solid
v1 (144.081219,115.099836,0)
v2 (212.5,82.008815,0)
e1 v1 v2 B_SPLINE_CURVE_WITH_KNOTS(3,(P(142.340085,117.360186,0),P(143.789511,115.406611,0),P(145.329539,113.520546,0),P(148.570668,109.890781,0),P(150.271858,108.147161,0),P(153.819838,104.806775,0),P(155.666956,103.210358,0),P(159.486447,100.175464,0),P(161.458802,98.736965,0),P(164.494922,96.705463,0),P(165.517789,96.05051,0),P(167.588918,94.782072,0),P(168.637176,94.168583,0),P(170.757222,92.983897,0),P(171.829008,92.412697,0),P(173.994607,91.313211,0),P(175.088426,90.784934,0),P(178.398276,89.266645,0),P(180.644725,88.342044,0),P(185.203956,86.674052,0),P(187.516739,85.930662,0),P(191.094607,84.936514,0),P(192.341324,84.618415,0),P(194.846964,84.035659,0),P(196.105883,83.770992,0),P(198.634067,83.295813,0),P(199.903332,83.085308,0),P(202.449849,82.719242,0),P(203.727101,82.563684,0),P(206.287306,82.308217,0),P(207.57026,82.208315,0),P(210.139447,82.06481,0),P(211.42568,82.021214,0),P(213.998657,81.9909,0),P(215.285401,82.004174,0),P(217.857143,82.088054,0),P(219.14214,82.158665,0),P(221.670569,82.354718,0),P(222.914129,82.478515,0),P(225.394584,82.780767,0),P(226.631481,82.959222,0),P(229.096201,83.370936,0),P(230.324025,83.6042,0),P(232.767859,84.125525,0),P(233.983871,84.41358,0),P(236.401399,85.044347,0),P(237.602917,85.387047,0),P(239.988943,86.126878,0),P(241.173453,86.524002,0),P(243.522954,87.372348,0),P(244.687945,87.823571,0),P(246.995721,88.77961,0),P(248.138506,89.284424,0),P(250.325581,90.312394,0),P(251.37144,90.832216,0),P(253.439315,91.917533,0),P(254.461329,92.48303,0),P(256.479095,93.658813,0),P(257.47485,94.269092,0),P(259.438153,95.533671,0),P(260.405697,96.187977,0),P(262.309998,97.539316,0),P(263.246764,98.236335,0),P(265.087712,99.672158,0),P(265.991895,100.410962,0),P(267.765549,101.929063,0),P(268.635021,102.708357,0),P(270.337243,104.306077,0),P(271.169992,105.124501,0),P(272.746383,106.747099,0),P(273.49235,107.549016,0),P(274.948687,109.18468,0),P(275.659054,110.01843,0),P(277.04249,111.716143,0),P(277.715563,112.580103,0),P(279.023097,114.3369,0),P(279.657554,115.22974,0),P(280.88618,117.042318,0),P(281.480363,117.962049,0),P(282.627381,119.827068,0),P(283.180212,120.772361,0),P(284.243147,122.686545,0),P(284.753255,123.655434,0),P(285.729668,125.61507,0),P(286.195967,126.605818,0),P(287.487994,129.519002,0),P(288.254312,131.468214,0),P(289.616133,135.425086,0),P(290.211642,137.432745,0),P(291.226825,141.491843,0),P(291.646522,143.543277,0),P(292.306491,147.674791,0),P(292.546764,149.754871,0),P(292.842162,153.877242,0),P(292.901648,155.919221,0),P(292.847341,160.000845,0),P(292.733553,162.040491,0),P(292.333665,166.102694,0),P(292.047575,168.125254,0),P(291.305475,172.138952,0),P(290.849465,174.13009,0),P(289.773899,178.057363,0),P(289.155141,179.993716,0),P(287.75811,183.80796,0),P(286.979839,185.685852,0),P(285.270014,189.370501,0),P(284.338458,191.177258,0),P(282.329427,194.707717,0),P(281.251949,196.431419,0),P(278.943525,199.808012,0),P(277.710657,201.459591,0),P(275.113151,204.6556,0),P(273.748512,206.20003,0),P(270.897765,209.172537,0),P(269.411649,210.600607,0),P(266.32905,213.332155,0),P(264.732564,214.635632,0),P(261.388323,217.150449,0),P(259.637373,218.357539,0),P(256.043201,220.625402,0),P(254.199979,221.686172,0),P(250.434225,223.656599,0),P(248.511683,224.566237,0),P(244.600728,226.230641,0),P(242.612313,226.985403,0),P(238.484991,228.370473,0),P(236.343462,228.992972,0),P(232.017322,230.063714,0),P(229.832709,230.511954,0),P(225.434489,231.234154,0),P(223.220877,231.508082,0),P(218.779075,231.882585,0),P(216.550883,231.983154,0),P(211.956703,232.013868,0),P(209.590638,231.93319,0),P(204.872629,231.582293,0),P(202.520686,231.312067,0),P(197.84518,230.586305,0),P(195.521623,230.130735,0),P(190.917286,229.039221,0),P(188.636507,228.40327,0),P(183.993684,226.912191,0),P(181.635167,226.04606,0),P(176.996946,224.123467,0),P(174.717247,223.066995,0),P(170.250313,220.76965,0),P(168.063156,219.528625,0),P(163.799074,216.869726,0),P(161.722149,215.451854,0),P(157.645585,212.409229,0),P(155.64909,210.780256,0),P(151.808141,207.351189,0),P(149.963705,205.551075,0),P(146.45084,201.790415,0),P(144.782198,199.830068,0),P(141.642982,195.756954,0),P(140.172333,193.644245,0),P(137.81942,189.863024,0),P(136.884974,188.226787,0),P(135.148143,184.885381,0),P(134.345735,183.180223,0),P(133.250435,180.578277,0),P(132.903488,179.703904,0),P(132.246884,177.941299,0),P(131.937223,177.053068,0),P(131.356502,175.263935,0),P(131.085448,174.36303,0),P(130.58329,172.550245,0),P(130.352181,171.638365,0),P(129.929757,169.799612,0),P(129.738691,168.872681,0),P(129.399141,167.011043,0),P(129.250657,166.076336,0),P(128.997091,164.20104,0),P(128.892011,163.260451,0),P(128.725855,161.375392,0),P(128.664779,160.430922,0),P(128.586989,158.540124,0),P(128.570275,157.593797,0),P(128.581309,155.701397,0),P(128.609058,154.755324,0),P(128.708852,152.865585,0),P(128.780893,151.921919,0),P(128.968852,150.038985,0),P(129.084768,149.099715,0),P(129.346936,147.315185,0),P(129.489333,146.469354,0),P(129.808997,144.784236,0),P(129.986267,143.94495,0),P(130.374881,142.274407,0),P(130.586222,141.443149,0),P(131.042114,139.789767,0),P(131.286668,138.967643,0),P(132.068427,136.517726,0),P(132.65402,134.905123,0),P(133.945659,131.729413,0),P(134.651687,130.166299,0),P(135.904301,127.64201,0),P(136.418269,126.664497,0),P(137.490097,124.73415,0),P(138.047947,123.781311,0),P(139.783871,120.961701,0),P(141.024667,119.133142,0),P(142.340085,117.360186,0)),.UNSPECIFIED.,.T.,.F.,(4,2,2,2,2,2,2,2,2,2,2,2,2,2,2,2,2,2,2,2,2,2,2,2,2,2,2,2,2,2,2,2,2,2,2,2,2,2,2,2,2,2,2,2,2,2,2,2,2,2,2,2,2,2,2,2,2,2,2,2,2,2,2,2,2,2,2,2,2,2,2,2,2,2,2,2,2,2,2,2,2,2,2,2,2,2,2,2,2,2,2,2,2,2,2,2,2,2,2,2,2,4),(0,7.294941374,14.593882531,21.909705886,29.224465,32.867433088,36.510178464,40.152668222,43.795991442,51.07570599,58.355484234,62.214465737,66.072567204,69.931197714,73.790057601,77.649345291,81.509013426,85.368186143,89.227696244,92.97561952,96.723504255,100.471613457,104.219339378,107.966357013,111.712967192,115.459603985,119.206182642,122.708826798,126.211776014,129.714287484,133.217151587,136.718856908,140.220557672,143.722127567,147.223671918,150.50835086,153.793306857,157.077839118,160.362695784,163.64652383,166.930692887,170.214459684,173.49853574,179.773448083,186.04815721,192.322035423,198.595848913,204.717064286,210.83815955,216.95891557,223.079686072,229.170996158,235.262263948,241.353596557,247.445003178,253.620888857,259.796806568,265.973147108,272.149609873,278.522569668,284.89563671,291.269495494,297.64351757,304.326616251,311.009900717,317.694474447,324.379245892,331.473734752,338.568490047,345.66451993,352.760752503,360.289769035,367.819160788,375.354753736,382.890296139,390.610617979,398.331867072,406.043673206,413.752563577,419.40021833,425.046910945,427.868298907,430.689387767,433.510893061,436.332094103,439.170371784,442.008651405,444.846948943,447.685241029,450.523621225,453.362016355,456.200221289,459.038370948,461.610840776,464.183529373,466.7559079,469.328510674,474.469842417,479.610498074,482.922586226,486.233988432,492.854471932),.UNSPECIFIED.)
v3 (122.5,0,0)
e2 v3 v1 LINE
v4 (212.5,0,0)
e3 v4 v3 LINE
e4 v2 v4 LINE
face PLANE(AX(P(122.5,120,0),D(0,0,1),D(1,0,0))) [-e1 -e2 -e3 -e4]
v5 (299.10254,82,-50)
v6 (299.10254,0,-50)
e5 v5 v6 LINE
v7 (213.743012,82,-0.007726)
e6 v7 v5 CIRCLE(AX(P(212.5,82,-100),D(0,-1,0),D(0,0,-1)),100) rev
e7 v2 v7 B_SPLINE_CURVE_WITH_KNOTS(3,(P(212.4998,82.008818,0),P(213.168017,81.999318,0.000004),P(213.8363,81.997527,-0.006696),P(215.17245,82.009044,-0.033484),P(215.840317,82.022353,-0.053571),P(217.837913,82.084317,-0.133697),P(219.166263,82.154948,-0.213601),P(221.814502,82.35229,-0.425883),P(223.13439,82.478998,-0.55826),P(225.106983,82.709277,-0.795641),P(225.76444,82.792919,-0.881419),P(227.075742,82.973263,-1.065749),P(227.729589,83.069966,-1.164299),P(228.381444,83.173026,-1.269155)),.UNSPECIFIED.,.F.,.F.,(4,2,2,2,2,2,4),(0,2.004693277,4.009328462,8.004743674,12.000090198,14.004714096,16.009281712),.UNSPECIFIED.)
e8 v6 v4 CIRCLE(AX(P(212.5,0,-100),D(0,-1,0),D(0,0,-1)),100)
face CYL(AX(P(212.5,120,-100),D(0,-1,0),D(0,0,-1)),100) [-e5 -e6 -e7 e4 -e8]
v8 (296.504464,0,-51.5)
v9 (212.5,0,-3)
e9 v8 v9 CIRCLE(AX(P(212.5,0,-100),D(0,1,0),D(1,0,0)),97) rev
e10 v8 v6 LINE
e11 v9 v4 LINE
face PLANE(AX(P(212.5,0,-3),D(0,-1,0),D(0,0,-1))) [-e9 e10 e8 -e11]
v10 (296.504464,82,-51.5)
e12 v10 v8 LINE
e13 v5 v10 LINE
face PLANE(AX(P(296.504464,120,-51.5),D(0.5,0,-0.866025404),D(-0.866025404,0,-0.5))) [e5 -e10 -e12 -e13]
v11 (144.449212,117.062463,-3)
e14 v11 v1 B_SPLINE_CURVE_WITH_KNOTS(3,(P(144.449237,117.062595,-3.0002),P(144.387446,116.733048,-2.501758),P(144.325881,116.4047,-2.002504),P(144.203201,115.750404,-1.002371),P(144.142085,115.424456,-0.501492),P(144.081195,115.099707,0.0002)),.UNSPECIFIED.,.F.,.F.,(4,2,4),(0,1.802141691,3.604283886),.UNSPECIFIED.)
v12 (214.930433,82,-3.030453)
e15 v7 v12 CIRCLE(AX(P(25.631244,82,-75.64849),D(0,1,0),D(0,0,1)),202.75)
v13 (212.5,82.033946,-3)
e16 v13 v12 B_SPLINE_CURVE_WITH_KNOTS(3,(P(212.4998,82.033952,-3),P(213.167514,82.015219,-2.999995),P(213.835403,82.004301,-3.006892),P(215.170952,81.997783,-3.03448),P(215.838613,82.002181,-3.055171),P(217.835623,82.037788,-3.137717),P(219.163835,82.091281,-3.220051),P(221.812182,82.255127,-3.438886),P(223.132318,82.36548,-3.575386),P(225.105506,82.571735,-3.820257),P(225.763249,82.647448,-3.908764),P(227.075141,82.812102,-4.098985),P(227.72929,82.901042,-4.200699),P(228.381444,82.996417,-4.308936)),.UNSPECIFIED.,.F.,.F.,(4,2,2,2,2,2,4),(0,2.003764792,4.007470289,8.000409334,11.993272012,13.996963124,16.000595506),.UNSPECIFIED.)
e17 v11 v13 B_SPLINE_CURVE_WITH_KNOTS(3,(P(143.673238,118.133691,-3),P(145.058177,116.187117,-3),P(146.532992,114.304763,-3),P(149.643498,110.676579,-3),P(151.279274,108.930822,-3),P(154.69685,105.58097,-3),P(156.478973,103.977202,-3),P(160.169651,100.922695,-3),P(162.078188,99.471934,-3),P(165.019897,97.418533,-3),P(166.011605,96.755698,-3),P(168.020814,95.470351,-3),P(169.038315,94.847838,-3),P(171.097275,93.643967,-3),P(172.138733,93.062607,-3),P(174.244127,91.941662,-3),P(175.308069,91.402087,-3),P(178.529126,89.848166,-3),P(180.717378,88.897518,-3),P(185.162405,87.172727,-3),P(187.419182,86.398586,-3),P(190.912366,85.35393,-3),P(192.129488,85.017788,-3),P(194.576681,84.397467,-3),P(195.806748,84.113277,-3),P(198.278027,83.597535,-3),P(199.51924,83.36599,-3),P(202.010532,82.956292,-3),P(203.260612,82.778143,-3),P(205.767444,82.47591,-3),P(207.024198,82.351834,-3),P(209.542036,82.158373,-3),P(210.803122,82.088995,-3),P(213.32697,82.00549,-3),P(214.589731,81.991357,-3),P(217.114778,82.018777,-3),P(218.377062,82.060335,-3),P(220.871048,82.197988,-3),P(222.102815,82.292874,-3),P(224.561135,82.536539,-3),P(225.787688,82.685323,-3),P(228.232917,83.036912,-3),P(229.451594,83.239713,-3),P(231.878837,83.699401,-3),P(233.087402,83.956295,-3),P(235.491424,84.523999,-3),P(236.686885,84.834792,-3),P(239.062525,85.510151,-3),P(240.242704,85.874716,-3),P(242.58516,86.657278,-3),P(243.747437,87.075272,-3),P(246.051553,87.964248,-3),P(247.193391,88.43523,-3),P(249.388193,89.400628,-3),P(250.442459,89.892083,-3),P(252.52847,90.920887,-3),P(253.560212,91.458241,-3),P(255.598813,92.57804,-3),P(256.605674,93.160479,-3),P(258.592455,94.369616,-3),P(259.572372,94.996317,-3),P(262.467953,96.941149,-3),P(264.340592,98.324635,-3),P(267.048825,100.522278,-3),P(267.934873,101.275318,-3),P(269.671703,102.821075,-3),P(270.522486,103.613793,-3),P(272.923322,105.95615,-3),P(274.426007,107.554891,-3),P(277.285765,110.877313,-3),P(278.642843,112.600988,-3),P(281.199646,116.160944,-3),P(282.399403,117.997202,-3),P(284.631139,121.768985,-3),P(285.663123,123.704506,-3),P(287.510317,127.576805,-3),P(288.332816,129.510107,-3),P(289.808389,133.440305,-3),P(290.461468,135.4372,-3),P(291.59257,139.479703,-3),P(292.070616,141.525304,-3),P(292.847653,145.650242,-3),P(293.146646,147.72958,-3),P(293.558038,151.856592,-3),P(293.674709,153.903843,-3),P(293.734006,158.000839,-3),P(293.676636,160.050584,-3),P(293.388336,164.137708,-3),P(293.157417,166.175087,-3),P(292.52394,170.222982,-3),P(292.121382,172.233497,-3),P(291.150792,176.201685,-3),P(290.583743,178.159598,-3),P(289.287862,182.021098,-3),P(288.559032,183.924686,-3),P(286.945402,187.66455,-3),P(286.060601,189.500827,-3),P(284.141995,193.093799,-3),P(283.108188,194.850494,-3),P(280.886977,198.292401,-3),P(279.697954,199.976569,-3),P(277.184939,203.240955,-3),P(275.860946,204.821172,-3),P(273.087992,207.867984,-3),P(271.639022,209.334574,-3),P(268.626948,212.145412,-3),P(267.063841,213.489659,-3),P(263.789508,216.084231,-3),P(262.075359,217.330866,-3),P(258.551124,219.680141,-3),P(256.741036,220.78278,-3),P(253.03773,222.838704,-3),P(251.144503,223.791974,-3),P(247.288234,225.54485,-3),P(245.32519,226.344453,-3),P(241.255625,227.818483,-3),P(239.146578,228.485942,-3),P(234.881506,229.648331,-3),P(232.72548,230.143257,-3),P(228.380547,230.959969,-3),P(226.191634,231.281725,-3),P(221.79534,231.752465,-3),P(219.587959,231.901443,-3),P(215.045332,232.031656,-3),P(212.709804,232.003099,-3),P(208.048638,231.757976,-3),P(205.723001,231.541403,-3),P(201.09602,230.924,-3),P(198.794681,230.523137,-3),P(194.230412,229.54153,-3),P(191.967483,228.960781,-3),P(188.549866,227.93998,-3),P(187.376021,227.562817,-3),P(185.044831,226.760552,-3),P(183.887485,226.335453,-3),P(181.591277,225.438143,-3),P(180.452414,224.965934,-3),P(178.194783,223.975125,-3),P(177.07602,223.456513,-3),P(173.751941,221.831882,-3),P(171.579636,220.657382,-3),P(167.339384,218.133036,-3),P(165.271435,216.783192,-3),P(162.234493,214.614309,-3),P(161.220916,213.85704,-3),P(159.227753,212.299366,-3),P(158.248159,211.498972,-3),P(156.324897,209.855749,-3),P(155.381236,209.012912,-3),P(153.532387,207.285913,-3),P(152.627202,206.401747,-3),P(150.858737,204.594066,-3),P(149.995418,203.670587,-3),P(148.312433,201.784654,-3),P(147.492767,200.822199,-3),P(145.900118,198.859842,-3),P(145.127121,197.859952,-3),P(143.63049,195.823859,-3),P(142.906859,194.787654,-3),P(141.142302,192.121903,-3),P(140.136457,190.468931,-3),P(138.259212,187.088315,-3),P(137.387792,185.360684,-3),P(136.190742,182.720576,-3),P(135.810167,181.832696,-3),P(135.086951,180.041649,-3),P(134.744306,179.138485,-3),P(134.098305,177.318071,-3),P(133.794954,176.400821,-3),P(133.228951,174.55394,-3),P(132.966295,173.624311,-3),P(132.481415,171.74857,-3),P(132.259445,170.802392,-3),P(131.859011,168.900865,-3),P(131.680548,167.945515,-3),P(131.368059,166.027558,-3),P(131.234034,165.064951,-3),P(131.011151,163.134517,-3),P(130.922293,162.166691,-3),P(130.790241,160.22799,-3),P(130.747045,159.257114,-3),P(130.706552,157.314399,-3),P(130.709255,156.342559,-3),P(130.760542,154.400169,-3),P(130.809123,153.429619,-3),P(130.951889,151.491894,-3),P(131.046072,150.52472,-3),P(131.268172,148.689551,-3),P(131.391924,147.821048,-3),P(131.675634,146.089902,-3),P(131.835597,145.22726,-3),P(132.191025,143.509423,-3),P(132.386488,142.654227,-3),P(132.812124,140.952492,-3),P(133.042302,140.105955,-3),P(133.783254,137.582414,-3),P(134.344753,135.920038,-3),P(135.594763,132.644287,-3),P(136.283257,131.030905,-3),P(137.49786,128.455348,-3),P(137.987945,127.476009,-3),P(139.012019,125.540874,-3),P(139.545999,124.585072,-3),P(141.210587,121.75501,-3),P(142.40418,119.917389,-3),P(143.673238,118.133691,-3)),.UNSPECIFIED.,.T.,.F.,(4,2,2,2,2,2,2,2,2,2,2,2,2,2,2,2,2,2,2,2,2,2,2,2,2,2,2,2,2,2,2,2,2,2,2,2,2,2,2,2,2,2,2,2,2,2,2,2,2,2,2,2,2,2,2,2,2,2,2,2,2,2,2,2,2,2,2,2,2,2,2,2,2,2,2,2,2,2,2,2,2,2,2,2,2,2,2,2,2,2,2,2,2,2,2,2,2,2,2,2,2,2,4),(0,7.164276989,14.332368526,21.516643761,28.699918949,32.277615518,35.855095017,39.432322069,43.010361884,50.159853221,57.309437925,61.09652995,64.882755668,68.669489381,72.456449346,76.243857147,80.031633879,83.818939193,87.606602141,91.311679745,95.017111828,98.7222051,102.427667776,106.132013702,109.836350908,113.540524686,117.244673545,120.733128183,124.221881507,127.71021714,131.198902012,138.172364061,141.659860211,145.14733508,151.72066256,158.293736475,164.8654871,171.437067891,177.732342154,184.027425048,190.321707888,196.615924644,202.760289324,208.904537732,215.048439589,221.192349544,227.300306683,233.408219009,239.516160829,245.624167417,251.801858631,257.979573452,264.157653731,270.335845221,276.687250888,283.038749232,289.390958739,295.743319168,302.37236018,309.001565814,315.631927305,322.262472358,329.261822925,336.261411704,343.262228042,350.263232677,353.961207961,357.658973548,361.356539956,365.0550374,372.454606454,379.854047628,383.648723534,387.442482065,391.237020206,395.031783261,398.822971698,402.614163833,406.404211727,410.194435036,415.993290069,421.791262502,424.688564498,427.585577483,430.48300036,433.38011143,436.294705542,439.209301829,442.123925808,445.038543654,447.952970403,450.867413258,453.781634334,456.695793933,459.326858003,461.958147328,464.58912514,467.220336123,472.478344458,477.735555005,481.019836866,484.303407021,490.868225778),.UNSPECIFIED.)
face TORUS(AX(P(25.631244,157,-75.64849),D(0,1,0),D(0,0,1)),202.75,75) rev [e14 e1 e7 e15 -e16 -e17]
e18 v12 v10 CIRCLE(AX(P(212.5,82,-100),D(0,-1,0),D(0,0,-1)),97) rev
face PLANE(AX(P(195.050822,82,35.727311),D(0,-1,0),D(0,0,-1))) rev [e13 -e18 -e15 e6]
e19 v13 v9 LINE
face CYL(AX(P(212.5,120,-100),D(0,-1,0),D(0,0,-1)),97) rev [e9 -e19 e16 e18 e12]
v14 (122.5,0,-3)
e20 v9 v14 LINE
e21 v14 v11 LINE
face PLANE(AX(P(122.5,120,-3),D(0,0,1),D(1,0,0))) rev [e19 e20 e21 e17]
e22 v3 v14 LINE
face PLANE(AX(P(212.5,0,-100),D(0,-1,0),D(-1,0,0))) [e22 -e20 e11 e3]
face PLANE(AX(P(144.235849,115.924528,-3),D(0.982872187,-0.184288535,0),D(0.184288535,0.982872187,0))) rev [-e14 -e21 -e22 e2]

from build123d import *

# Parameters (mm, degrees)
BASE_FLANGE1_DEPTH = 120
CUT_EXTRUDE1_DEPTH = 10


# Sheet-metal steps are written as plain solids
with BuildPart() as part:
    # Sketch1 → Base-Flange1 (new body)
    with BuildSketch(Plane(origin=(0, 0, 0), x_dir=(1, 0, 0), z_dir=(0, 1, 0))):
        with BuildLine():
            Line((122.5, 0), (212.5, 0))
            ThreePointArc((212.5, 0), (262.5, 13.397459622), (299.102540378, 50))
            Line((299.102540378, 50), (296.504464167, 51.5))
            ThreePointArc((296.504464167, 51.5), (261, 15.995535833), (212.5, 3))
            Line((212.5, 3), (122.5, 3))
            Line((122.5, 3), (122.5, 0))
        make_face()
    extrude(amount=BASE_FLANGE1_DEPTH)

    # Sketch6 → Cut-Extrude1 (cut)
    with BuildSketch(Plane.XY):
        Polygon((122.5, 120), (145, 120), (122.5, 0), align=None)
    extrude(amount=-CUT_EXTRUDE1_DEPTH, mode=Mode.SUBTRACT)

    # Sketch12 → Cut-Revolve1 (revolve, cut)
    with BuildSketch(Plane(origin=(25.631243638, 0, -75.648490011), x_dir=(0.8356082783221033, 0, 0.5493257732890113), z_dir=(0.5493257732890113, 0, -0.8356082783221033))):
        with BuildLine():
            Line((202.75, -82), (370.763557892, -82))
            Line((370.763557892, -82), (370.763557892, -132))
            Line((370.763557892, -132), (132.039321881, -132))
            ThreePointArc((132.039321881, -132), (159.448729811, -95.76275643), (202.75, -82))
        make_face()
    revolve(axis=Axis((25.631243638, 0, -75.648490011), (0, -1, 0)), mode=Mode.SUBTRACT)


solid = part.part
